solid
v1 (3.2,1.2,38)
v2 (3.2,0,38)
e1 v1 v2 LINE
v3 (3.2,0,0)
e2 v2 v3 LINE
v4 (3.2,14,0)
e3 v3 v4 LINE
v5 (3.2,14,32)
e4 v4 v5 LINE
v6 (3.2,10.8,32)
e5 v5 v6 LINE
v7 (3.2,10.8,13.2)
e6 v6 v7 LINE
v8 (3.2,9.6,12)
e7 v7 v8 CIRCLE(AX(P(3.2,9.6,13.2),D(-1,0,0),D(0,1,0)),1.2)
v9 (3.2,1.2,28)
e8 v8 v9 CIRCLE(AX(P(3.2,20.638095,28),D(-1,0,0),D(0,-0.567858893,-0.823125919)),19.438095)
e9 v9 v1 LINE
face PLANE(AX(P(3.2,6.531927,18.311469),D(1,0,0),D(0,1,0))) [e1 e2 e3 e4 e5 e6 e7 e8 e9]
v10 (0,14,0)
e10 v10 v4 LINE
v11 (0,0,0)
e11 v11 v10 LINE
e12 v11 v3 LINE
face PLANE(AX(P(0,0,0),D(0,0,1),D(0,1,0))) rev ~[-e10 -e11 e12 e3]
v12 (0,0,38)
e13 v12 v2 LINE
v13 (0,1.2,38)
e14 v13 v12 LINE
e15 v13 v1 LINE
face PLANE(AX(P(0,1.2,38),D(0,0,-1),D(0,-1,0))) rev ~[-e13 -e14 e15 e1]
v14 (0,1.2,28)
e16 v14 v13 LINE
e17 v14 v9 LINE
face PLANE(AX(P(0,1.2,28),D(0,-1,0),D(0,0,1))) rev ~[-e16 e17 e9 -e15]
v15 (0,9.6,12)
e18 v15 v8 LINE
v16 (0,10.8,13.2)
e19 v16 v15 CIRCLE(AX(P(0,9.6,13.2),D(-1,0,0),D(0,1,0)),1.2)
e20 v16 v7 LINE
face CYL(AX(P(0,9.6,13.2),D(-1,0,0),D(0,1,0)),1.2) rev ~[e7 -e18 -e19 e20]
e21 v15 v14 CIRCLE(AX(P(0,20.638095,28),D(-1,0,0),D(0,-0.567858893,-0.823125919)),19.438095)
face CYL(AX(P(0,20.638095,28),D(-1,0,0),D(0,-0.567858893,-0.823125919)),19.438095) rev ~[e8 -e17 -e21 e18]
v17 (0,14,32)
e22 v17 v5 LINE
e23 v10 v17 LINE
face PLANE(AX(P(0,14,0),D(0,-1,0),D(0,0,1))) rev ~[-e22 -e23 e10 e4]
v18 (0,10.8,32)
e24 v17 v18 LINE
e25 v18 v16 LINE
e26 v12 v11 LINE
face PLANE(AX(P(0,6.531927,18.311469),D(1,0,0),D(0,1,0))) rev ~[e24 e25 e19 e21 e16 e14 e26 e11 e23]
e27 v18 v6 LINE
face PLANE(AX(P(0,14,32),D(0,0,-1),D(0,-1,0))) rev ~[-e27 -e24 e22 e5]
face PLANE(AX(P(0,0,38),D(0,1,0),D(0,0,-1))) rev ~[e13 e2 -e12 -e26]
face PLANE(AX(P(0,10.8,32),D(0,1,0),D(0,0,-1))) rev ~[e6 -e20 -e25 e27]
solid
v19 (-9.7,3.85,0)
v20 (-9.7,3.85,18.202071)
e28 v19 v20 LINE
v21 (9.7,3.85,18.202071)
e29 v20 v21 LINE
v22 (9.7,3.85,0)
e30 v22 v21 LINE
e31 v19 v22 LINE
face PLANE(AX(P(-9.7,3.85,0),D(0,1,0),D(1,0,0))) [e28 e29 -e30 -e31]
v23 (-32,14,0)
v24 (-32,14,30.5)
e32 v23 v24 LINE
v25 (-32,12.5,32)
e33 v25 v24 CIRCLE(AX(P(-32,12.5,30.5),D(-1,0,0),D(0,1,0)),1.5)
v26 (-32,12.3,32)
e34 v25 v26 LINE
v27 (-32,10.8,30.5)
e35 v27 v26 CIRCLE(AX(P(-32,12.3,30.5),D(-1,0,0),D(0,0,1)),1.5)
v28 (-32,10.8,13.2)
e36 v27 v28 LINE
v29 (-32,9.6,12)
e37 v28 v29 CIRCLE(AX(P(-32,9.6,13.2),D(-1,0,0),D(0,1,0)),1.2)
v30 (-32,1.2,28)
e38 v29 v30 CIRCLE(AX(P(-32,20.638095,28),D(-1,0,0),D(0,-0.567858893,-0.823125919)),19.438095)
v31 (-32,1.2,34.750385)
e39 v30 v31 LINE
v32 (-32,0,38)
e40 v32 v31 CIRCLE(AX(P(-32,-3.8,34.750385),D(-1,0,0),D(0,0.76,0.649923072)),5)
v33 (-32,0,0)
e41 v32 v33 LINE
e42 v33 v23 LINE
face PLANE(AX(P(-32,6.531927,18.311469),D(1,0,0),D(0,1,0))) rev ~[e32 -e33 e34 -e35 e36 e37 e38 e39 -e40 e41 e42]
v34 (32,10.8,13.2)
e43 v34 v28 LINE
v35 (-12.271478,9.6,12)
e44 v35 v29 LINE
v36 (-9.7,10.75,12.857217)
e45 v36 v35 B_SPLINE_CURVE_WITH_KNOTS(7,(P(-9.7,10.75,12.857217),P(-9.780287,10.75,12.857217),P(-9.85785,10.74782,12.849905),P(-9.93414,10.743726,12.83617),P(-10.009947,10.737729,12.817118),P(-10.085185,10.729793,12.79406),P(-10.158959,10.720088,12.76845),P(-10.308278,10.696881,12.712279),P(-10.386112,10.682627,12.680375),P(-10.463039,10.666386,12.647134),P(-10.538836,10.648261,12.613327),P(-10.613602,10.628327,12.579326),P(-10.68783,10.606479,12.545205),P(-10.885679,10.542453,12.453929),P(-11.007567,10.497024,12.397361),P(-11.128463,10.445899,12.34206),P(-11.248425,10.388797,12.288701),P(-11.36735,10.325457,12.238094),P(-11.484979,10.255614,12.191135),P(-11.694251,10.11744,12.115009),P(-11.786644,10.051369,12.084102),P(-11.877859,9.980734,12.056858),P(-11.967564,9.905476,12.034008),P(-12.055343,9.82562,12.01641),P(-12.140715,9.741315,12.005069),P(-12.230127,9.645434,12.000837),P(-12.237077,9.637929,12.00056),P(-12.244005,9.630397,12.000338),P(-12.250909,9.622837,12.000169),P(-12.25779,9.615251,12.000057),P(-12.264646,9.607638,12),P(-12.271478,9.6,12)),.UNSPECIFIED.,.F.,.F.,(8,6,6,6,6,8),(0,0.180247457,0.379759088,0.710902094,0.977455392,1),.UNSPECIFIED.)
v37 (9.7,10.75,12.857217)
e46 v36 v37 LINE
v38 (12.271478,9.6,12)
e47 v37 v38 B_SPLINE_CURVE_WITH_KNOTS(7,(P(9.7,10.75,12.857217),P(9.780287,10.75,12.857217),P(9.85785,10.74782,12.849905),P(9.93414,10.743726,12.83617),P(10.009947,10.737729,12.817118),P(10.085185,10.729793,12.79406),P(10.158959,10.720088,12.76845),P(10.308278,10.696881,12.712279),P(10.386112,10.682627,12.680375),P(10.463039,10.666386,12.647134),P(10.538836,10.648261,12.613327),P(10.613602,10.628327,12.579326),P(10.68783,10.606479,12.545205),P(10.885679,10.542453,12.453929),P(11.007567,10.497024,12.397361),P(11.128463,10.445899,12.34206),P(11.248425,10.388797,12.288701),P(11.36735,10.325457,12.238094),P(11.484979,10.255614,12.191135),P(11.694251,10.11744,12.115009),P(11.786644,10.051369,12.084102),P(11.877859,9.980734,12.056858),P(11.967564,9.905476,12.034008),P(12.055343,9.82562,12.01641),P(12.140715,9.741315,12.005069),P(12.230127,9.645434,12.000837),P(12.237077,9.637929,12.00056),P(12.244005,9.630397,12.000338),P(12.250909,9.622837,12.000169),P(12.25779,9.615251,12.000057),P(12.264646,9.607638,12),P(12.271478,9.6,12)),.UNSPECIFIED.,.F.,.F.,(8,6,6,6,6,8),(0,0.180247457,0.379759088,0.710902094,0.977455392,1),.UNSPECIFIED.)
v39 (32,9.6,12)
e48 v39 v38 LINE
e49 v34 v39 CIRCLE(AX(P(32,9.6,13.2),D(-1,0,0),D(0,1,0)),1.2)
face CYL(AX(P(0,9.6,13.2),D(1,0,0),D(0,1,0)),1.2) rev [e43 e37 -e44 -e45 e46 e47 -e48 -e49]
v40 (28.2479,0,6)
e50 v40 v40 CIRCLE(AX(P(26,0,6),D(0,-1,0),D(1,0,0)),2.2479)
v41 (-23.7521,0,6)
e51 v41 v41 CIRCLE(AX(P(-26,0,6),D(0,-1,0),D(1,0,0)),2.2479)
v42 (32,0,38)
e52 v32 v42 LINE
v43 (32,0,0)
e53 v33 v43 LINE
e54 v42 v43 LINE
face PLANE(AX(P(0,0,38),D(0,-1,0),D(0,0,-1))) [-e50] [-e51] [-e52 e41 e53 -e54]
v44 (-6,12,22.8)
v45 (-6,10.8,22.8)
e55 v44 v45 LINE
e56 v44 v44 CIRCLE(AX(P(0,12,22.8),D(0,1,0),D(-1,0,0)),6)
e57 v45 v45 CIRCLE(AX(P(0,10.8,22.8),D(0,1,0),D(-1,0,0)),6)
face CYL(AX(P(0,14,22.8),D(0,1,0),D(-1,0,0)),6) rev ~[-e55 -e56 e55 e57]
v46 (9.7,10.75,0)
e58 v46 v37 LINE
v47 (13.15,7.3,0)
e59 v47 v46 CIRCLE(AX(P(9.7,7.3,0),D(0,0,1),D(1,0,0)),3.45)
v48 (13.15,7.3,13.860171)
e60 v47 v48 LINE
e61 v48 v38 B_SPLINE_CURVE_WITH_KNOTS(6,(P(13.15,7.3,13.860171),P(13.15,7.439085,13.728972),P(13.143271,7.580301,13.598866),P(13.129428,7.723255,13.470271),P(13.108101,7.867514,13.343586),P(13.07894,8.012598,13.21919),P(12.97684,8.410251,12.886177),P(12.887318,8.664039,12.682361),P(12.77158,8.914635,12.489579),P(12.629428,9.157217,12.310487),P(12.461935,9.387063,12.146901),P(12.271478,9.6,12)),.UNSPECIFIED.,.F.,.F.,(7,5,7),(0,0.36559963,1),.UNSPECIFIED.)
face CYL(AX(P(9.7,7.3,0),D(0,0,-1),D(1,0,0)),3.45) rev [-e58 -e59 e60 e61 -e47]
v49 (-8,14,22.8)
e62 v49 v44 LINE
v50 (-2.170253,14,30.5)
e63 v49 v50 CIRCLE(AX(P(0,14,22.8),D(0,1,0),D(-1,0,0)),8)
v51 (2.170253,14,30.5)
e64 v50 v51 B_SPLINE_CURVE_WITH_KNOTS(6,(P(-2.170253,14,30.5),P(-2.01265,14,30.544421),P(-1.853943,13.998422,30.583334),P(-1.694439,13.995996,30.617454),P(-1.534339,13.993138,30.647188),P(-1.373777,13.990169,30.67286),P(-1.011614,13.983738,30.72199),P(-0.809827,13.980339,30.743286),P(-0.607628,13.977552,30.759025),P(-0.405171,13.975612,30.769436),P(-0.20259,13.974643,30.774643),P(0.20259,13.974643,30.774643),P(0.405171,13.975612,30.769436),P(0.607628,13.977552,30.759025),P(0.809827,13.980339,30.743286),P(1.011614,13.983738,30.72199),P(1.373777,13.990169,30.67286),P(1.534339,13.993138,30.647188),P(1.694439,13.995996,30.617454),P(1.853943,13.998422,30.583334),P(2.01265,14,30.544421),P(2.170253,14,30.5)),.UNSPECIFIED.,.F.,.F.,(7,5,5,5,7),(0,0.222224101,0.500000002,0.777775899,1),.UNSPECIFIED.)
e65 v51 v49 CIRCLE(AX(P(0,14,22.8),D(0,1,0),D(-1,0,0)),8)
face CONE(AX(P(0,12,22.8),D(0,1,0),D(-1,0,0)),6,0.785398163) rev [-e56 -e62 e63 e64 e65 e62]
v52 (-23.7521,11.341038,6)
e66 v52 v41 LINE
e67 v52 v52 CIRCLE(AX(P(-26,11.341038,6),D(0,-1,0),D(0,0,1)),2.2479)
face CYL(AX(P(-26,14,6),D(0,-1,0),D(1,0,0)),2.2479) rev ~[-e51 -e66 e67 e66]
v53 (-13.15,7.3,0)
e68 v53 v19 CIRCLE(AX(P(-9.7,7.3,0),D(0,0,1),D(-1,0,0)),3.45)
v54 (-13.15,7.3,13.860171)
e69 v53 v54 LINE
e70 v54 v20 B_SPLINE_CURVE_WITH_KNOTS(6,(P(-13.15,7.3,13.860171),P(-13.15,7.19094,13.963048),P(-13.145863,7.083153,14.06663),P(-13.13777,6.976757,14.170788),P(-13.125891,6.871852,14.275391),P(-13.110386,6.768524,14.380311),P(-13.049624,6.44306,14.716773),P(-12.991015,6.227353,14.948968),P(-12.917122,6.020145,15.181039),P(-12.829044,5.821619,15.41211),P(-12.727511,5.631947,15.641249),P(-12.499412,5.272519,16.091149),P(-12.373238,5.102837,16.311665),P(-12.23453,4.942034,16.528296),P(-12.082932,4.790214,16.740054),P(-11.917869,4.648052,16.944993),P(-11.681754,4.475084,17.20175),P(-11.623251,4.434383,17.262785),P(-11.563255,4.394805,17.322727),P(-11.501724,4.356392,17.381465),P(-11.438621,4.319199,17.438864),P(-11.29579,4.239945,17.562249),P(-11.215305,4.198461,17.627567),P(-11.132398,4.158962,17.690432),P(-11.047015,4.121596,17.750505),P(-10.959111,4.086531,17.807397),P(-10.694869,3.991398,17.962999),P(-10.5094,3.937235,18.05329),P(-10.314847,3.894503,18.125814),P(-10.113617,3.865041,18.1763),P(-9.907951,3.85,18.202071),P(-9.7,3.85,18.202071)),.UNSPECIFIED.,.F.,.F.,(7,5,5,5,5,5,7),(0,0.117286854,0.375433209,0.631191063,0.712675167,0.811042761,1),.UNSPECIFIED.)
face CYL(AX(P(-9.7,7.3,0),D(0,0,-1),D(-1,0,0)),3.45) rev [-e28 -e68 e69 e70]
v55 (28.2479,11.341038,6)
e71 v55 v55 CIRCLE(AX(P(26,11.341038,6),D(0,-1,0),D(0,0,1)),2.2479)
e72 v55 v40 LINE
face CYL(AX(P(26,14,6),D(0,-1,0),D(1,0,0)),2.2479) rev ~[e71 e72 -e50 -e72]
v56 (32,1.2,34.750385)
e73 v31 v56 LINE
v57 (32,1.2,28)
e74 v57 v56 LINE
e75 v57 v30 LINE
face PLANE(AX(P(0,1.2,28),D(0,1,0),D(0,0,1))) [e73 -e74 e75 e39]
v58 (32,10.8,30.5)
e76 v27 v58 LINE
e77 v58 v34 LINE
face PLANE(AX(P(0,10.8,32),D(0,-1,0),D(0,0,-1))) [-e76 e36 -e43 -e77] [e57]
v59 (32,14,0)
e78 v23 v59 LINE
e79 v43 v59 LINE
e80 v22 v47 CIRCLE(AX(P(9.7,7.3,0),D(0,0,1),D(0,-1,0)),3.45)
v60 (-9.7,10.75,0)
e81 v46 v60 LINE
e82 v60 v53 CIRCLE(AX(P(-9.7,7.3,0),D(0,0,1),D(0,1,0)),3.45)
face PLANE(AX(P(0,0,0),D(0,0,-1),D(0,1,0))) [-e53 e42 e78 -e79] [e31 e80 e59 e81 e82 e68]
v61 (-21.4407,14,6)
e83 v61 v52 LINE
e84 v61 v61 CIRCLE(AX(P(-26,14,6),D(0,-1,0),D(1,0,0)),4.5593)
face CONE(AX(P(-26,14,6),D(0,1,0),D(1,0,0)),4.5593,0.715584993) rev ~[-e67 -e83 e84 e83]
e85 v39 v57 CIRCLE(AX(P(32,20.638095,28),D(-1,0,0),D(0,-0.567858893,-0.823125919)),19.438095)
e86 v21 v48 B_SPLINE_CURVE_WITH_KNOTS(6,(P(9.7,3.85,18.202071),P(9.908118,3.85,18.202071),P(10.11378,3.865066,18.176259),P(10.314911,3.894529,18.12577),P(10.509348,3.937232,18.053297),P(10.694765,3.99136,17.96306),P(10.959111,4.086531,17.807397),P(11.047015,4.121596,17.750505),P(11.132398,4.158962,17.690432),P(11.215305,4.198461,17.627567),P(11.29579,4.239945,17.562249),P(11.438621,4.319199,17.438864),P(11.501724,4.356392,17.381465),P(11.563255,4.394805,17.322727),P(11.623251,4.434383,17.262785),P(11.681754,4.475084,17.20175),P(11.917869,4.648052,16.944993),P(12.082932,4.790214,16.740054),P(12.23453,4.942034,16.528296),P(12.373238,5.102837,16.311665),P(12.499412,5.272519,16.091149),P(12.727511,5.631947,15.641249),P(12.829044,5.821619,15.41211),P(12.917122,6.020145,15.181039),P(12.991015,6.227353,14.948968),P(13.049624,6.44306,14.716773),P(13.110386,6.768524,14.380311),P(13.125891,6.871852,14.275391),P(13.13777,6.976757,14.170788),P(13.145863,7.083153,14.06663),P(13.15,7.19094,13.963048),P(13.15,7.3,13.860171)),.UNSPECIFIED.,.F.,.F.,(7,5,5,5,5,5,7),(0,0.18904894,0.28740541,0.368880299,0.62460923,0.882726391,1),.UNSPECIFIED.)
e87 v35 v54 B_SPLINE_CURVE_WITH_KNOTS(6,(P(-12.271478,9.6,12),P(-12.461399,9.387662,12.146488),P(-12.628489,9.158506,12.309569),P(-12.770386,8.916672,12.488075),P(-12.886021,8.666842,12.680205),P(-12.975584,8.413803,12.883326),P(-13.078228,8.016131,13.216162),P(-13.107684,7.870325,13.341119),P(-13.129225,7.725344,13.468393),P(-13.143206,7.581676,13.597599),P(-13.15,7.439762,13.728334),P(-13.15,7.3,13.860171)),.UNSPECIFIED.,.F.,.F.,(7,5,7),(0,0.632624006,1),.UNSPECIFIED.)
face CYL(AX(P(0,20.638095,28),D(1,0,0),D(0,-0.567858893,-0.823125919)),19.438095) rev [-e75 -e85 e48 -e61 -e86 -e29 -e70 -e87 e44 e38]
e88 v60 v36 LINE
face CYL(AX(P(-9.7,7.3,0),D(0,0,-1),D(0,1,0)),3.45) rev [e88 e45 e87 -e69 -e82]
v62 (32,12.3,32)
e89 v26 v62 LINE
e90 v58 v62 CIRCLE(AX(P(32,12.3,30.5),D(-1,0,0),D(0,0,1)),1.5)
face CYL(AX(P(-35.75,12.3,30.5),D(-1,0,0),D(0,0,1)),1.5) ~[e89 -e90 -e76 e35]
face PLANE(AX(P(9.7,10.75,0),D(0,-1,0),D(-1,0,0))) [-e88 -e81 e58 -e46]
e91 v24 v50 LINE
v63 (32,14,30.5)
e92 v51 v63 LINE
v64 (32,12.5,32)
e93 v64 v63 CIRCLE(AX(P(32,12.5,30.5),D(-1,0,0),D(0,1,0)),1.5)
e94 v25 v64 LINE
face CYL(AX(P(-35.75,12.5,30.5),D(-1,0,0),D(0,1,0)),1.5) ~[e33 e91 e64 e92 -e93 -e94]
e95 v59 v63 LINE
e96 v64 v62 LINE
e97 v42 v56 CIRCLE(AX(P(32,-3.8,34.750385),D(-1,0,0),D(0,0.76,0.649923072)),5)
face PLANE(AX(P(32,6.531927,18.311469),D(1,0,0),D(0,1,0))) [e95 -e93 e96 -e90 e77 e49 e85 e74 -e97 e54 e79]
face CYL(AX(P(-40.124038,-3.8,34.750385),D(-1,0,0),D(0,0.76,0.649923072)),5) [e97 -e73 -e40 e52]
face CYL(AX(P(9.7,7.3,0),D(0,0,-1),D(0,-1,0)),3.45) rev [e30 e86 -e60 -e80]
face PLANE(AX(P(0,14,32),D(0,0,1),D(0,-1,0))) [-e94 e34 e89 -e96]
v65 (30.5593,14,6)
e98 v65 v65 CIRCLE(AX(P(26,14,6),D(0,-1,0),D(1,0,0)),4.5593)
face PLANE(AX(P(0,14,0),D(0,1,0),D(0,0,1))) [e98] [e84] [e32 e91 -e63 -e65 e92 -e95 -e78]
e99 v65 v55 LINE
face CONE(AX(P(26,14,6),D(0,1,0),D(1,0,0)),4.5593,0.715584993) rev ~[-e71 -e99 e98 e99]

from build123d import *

# Parameters (mm, degrees)
F1_DEPTH       = 3.2
F2_DEPTH       = 32
F4_DEPTH       = 38.001
F5_R           = 6
F6_DEPTH       = 3.2
F7_SIZE        = 2
F8_T1_DEPTH    = 71.5
F9_D           = 4.4958
F9_CSINK_D     = 9.1186
F9_CSINK_ANGLE = 82
F10_T1_DEPTH   = 80.2480768093


# Not quite as in the source:
# - a fillet or chamfer that OpenCascade refuses, or shapes differently, is made with other operations: its cross-section is extruded or revolved along the edge and cut away or added


with BuildPart() as f1:
    # F0 (on Right) → F1 (new body)
    with BuildSketch(Plane.YZ):
        with BuildLine():
            Line((1.2, 28), (1.2, 38))
            Line((1.2, 38), (0, 38))
            Line((0, 38), (0, 0))
            Line((0, 0), (14, 0))
            Line((14, 0), (14, 32))
            Line((14, 32), (10.8, 32))
            Line((10.8, 32), (10.8, 13.2))
            ThreePointArc((10.8, 13.2), (10.4485281374, 12.3514718626), (9.6, 12))
            ThreePointArc((9.6, 12), (3.4276464791, 18.9645144015), (1.2, 28))
        make_face()
    extrude(amount=F1_DEPTH)


with BuildPart() as f2:
    # F0 (on Right) → F2 (new body, symmetric)
    with BuildSketch(Plane.YZ):
        with BuildLine():
            Line((1.2, 28), (1.2, 38))
            Line((1.2, 38), (0, 38))
            Line((0, 38), (0, 0))
            Line((0, 0), (14, 0))
            Line((14, 0), (14, 32))
            Line((14, 32), (10.8, 32))
            Line((10.8, 32), (10.8, 13.2))
            ThreePointArc((10.8, 13.2), (10.4485281374, 12.3514718626), (9.6, 12))
            ThreePointArc((9.6, 12), (3.4276464791, 18.9645144015), (1.2, 28))
        make_face()
    extrude(amount=F2_DEPTH, both=True)

    # F3 (on Top) → F4 (cut, through all)
    with BuildSketch(Plane.XY):
        with BuildLine():
            ThreePointArc((13.15, 7.3), (12.1395183951, 9.7395183951), (9.7, 10.75))
            Line((9.7, 10.75), (-9.7, 10.75))
            ThreePointArc((-9.7, 10.75), (-12.1395183951, 9.7395183951), (-13.15, 7.3))
            ThreePointArc((-13.15, 7.3), (-12.1395183951, 4.8604816049), (-9.7, 3.85))
            Line((-9.7, 3.85), (9.7, 3.85))
            ThreePointArc((9.7, 3.85), (12.1395183951, 4.8604816049), (13.15, 7.3))
        make_face()
    extrude(amount=F4_DEPTH, mode=Mode.SUBTRACT)

    # F5 (on face) → F6 (cut, through all)
    with BuildSketch(Plane(origin=(0, 14, 0), x_dir=(-1, 0, 0), z_dir=(0, 1, 0))):
        with Locations((0, 22.8)):
            Circle(F5_R)
    extrude(amount=-F6_DEPTH, mode=Mode.SUBTRACT)

    # F7
    f7_edges = [f2.edges().sort_by_distance(p)[0] for p in [
        (6, 14, 22.8),
    ]]
    chamfer(f7_edges, length=F7_SIZE)

    # F8: fillet of radius 1.5 on 2 edges, made by hand

    # F8_s2 → F8_t1 (cut)
    with BuildSketch(Plane.YZ.offset(-35.75)):
        with BuildLine():
            ThreePointArc((14, 30.5), (13.5606601718, 31.5606601718), (12.5, 32))
            Line((12.5, 32), (14, 32))
            Line((14, 32), (14, 30.5))
        make_face()
        with BuildLine():
            ThreePointArc((12.3, 32), (11.2393398282, 31.5606601718), (10.8, 30.5))
            Line((10.8, 30.5), (10.8, 32))
            Line((10.8, 32), (12.3, 32))
        make_face()
    extrude(amount=F8_T1_DEPTH, mode=Mode.SUBTRACT)

    # F9 (through all)
    with Locations(Plane(origin=(0, 14, 0), x_dir=(-1, 0, 0), z_dir=(0, 1, 0))):
        with Locations((-26, 6), (26, 6)):
            CounterSinkHole(F9_D / 2, F9_CSINK_D / 2, counter_sink_angle=F9_CSINK_ANGLE)

    # F10: fillet of radius 5 on 1 edges, made by hand

    # F10_s2 → F10_t1 (cut)
    with BuildSketch(Plane.YZ.offset(-40.1240384046)):
        with BuildLine():
            ThreePointArc((0, 38), (0.8904157598, 36.4824354457), (1.2, 34.7503846381))
            Line((1.2, 34.7503846381), (1.2, 38))
            Line((1.2, 38), (0, 38))
        make_face()
    extrude(amount=F10_T1_DEPTH, mode=Mode.SUBTRACT)


solid = Compound([f1.part, f2.part])
